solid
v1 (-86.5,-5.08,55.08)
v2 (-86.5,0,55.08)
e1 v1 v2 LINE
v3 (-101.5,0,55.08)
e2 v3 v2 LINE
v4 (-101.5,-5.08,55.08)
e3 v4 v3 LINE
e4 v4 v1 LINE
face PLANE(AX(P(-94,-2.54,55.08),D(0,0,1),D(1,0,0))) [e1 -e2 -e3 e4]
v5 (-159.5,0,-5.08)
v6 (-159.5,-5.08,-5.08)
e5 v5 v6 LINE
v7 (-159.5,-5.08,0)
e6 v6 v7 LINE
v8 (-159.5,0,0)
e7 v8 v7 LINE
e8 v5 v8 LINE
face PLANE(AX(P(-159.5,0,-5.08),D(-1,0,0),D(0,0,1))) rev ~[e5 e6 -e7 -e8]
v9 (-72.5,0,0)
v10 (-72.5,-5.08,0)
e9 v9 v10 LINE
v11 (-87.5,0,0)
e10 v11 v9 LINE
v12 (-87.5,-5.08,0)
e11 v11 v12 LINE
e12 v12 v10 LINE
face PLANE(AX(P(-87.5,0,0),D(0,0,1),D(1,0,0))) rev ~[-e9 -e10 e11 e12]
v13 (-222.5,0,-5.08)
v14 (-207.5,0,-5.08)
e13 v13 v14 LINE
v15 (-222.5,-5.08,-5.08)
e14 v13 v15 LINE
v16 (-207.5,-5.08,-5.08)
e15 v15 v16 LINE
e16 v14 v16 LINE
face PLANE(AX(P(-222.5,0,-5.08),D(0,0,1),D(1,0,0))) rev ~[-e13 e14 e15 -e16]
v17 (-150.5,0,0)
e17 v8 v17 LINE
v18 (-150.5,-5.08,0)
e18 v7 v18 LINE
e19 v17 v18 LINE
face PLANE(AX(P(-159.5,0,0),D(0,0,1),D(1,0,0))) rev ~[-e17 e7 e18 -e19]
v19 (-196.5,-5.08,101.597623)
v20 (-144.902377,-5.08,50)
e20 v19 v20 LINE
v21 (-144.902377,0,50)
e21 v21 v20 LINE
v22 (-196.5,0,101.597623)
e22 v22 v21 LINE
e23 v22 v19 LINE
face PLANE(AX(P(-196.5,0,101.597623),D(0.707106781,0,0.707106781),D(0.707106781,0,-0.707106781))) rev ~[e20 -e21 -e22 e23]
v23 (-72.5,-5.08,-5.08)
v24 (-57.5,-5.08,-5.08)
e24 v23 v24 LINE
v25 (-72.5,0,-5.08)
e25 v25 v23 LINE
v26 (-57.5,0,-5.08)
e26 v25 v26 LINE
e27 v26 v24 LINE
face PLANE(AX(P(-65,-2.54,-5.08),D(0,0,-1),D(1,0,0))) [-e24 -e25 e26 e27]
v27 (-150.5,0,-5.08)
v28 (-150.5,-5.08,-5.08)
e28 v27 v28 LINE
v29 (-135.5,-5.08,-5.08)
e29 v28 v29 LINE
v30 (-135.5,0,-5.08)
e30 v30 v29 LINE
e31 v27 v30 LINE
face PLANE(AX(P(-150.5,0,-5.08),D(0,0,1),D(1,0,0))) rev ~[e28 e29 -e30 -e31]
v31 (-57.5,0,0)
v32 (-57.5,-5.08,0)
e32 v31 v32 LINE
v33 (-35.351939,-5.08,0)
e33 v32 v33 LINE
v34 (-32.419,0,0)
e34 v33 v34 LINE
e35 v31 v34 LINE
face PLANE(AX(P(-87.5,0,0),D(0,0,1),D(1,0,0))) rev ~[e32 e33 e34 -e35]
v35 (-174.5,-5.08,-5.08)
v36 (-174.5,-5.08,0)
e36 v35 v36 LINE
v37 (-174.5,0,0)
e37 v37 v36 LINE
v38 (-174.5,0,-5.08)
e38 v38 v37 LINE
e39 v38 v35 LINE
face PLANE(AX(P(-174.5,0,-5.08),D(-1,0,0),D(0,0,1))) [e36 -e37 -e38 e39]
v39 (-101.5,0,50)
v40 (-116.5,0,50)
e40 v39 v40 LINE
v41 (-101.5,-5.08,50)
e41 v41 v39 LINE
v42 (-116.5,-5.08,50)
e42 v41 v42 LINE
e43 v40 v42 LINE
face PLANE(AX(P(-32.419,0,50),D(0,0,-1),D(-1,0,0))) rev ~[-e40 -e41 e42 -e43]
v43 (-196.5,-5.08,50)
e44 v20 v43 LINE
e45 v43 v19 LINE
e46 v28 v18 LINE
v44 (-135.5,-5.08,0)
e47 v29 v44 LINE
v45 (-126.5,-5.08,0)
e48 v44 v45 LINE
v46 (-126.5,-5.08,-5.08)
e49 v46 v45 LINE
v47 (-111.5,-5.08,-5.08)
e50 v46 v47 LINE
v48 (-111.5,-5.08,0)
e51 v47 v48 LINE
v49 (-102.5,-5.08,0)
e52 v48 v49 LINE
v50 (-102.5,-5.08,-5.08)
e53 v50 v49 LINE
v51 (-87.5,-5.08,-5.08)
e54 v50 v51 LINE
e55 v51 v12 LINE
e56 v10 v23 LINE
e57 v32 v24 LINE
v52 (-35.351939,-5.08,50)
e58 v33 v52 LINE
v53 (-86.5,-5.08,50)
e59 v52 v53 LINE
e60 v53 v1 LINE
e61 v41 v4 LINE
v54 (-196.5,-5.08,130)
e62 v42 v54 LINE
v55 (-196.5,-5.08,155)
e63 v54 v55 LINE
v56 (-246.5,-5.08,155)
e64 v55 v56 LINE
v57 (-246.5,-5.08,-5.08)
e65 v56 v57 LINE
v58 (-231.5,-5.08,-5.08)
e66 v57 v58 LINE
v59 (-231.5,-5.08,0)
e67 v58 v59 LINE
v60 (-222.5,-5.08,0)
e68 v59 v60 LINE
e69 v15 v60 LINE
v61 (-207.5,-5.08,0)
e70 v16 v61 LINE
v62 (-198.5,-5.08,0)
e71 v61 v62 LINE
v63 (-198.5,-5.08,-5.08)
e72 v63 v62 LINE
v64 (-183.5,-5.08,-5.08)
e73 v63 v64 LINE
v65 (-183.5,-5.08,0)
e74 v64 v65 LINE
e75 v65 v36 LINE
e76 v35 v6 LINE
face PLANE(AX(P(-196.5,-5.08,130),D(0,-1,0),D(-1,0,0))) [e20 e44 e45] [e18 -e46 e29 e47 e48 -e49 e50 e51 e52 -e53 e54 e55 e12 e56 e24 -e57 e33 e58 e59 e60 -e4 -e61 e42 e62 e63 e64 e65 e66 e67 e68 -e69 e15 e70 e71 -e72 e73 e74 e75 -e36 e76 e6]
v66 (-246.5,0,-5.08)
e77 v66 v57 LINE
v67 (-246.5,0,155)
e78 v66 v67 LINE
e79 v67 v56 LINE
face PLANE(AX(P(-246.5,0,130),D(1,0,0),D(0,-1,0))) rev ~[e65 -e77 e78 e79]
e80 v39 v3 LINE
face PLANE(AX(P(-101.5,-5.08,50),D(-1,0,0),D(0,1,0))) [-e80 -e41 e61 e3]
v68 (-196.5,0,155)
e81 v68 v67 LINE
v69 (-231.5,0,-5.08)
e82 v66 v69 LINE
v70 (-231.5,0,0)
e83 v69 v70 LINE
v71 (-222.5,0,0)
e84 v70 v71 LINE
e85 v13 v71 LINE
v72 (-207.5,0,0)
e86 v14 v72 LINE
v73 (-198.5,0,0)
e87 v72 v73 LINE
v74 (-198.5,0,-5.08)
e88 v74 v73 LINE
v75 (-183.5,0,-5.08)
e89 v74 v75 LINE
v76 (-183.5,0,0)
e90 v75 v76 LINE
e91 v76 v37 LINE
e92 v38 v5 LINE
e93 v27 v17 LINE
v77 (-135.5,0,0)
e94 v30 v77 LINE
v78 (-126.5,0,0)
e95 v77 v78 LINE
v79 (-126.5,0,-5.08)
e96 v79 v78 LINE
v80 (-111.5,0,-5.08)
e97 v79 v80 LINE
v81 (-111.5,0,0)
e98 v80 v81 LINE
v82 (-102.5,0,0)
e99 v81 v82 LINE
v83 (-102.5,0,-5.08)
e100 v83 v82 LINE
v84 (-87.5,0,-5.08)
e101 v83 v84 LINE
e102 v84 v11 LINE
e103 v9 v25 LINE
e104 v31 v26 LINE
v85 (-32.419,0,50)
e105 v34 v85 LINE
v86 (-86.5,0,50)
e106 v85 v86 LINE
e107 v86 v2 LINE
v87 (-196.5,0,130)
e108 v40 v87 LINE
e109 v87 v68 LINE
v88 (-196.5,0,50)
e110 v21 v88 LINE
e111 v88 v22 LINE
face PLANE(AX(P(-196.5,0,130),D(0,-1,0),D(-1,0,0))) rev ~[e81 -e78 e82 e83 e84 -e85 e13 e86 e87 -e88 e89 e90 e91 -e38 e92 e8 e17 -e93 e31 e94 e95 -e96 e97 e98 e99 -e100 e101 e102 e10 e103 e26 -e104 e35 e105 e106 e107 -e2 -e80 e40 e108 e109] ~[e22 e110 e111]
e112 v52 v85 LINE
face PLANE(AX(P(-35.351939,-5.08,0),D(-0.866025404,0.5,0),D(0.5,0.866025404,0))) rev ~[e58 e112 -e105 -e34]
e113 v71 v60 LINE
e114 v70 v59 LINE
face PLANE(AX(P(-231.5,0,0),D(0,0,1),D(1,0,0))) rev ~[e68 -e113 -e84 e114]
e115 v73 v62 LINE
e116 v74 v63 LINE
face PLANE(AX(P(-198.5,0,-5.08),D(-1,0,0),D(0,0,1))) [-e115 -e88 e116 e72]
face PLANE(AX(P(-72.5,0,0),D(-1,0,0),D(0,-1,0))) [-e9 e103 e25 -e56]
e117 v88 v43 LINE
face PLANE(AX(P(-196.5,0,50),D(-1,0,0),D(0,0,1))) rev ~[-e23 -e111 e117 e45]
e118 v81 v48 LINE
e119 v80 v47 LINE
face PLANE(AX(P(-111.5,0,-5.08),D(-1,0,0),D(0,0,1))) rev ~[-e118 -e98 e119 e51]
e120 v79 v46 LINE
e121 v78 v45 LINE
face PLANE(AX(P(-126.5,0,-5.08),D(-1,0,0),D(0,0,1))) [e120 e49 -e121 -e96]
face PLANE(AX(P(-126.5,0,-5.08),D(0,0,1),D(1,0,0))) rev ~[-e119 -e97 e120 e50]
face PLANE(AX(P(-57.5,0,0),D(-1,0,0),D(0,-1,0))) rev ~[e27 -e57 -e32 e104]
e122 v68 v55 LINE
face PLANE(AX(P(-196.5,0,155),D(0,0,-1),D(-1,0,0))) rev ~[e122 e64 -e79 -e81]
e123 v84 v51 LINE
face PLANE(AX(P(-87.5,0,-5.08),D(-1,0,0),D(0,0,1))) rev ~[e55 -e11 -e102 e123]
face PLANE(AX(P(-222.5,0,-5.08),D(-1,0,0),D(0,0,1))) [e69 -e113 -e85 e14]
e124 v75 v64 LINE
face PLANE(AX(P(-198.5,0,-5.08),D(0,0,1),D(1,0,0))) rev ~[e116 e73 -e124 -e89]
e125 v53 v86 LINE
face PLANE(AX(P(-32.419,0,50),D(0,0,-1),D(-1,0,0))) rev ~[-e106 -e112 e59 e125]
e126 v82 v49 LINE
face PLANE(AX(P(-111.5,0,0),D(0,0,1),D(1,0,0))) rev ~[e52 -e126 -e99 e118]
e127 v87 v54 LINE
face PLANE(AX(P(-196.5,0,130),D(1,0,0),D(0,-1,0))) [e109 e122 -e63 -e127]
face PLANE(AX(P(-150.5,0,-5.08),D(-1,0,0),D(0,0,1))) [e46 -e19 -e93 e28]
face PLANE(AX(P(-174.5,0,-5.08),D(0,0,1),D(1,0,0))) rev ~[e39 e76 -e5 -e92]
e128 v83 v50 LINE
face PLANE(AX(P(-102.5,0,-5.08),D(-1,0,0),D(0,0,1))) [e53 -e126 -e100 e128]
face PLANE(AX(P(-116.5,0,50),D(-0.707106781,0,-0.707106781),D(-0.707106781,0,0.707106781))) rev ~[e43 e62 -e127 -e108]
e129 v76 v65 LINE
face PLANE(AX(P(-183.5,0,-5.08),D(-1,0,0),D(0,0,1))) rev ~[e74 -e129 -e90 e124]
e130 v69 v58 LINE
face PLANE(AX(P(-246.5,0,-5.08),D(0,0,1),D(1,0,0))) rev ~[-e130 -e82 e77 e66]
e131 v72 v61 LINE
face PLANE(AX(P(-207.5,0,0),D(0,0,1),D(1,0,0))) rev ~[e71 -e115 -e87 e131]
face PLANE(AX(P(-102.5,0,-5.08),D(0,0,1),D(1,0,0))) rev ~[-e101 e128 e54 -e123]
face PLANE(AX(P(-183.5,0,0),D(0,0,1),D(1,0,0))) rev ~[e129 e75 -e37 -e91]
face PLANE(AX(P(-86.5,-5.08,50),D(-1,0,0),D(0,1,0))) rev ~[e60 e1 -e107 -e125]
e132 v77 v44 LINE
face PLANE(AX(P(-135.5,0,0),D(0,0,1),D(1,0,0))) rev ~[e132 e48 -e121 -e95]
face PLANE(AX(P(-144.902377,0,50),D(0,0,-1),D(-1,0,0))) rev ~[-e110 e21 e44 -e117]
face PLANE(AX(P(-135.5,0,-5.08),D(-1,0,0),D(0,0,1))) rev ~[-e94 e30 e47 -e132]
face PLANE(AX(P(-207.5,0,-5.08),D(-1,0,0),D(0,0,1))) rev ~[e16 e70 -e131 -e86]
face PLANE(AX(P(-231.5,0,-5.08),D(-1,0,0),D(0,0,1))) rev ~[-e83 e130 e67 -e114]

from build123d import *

# Parameters (mm, degrees)
F0_W     = 15
F0_H     = 5.08
F1_DEPTH = 5.08
F2_DEPTH = 25
F4_DEPTH = 55.7
F5_W     = 15
F5_H     = 5.08
F6_DEPTH = 5.08
F7_W     = 15
F7_H     = 5.08
F8_DEPTH = 5.08


# Not quite as in the source:
# - a feature names something its author has since deleted; it is built from what else it names


with BuildPart() as f1:
    # F0 (on Front) → F1 (new body)
    with BuildSketch(Plane.XZ):
        Polygon((-87.5, 0), (-32.419, 0), (-32.419, 50), (-116.5, 50), (-144.9023774395, 50), (-196.5, 50), (-196.5, 101.5976225605), (-196.5, 130), (-246.5, 130), (-246.5, 0), (-231.5, 0), (-222.5, 0), (-207.5, 0), (-198.5, 0), (-183.5, 0), (-174.5, 0), (-159.5, 0), (-150.5, 0), (-135.5, 0), (-126.5, 0), (-111.5, 0), (-102.5, 0), align=None)
        with Locations((-95, -2.54)):
            Rectangle(F0_W, F0_H)
        Polygon((-144.9023774395, 50), (-116.5, 50), (-196.5, 130), (-196.5, 101.5976225605), align=None)
        with Locations((-119, -2.54)):
            Rectangle(F0_W, F0_H)
        with Locations((-143, -2.54)):
            Rectangle(F0_W, F0_H)
        with Locations((-239, -2.54)):
            Rectangle(F0_W, F0_H)
        with Locations((-167, -2.54)):
            Rectangle(F0_W, F0_H)
        with Locations((-215, -2.54)):
            Rectangle(F0_W, F0_H)
        with Locations((-191, -2.54)):
            Rectangle(F0_W, F0_H)
    extrude(amount=F1_DEPTH)

    # F2 (add): a face of the model
    f2_faces = [f1.faces().sort_by_distance(p)[0] for p in [
        (-221.5, -2.54, 130),
    ]]
    extrude(f2_faces, amount=F2_DEPTH)

    # F3 (on face) → F4 (cut)
    with BuildSketch(Plane(origin=(0, 0, 0), x_dir=(1, 0, 0), z_dir=(0, 0, -1))):
        Polygon((-32.419, 5.08), (-35.3519393675, 5.08), (-32.419, 0), align=None)
    extrude(amount=-F4_DEPTH, mode=Mode.SUBTRACT)

    # F5 (on face) → F6 (join)
    with BuildSketch(Plane(origin=(0, 0, 0), x_dir=(1, 0, 0), z_dir=(0, 0, -1))):
        with Locations((-65, 2.54)):
            Rectangle(F5_W, F5_H)
    extrude(amount=F6_DEPTH)

    # F7 (on face) → F8 (join)
    with BuildSketch(Plane.XY.offset(50)):
        with Locations((-94, -2.54)):
            Rectangle(F7_W, F7_H)
    extrude(amount=F8_DEPTH)


solid = f1.part
